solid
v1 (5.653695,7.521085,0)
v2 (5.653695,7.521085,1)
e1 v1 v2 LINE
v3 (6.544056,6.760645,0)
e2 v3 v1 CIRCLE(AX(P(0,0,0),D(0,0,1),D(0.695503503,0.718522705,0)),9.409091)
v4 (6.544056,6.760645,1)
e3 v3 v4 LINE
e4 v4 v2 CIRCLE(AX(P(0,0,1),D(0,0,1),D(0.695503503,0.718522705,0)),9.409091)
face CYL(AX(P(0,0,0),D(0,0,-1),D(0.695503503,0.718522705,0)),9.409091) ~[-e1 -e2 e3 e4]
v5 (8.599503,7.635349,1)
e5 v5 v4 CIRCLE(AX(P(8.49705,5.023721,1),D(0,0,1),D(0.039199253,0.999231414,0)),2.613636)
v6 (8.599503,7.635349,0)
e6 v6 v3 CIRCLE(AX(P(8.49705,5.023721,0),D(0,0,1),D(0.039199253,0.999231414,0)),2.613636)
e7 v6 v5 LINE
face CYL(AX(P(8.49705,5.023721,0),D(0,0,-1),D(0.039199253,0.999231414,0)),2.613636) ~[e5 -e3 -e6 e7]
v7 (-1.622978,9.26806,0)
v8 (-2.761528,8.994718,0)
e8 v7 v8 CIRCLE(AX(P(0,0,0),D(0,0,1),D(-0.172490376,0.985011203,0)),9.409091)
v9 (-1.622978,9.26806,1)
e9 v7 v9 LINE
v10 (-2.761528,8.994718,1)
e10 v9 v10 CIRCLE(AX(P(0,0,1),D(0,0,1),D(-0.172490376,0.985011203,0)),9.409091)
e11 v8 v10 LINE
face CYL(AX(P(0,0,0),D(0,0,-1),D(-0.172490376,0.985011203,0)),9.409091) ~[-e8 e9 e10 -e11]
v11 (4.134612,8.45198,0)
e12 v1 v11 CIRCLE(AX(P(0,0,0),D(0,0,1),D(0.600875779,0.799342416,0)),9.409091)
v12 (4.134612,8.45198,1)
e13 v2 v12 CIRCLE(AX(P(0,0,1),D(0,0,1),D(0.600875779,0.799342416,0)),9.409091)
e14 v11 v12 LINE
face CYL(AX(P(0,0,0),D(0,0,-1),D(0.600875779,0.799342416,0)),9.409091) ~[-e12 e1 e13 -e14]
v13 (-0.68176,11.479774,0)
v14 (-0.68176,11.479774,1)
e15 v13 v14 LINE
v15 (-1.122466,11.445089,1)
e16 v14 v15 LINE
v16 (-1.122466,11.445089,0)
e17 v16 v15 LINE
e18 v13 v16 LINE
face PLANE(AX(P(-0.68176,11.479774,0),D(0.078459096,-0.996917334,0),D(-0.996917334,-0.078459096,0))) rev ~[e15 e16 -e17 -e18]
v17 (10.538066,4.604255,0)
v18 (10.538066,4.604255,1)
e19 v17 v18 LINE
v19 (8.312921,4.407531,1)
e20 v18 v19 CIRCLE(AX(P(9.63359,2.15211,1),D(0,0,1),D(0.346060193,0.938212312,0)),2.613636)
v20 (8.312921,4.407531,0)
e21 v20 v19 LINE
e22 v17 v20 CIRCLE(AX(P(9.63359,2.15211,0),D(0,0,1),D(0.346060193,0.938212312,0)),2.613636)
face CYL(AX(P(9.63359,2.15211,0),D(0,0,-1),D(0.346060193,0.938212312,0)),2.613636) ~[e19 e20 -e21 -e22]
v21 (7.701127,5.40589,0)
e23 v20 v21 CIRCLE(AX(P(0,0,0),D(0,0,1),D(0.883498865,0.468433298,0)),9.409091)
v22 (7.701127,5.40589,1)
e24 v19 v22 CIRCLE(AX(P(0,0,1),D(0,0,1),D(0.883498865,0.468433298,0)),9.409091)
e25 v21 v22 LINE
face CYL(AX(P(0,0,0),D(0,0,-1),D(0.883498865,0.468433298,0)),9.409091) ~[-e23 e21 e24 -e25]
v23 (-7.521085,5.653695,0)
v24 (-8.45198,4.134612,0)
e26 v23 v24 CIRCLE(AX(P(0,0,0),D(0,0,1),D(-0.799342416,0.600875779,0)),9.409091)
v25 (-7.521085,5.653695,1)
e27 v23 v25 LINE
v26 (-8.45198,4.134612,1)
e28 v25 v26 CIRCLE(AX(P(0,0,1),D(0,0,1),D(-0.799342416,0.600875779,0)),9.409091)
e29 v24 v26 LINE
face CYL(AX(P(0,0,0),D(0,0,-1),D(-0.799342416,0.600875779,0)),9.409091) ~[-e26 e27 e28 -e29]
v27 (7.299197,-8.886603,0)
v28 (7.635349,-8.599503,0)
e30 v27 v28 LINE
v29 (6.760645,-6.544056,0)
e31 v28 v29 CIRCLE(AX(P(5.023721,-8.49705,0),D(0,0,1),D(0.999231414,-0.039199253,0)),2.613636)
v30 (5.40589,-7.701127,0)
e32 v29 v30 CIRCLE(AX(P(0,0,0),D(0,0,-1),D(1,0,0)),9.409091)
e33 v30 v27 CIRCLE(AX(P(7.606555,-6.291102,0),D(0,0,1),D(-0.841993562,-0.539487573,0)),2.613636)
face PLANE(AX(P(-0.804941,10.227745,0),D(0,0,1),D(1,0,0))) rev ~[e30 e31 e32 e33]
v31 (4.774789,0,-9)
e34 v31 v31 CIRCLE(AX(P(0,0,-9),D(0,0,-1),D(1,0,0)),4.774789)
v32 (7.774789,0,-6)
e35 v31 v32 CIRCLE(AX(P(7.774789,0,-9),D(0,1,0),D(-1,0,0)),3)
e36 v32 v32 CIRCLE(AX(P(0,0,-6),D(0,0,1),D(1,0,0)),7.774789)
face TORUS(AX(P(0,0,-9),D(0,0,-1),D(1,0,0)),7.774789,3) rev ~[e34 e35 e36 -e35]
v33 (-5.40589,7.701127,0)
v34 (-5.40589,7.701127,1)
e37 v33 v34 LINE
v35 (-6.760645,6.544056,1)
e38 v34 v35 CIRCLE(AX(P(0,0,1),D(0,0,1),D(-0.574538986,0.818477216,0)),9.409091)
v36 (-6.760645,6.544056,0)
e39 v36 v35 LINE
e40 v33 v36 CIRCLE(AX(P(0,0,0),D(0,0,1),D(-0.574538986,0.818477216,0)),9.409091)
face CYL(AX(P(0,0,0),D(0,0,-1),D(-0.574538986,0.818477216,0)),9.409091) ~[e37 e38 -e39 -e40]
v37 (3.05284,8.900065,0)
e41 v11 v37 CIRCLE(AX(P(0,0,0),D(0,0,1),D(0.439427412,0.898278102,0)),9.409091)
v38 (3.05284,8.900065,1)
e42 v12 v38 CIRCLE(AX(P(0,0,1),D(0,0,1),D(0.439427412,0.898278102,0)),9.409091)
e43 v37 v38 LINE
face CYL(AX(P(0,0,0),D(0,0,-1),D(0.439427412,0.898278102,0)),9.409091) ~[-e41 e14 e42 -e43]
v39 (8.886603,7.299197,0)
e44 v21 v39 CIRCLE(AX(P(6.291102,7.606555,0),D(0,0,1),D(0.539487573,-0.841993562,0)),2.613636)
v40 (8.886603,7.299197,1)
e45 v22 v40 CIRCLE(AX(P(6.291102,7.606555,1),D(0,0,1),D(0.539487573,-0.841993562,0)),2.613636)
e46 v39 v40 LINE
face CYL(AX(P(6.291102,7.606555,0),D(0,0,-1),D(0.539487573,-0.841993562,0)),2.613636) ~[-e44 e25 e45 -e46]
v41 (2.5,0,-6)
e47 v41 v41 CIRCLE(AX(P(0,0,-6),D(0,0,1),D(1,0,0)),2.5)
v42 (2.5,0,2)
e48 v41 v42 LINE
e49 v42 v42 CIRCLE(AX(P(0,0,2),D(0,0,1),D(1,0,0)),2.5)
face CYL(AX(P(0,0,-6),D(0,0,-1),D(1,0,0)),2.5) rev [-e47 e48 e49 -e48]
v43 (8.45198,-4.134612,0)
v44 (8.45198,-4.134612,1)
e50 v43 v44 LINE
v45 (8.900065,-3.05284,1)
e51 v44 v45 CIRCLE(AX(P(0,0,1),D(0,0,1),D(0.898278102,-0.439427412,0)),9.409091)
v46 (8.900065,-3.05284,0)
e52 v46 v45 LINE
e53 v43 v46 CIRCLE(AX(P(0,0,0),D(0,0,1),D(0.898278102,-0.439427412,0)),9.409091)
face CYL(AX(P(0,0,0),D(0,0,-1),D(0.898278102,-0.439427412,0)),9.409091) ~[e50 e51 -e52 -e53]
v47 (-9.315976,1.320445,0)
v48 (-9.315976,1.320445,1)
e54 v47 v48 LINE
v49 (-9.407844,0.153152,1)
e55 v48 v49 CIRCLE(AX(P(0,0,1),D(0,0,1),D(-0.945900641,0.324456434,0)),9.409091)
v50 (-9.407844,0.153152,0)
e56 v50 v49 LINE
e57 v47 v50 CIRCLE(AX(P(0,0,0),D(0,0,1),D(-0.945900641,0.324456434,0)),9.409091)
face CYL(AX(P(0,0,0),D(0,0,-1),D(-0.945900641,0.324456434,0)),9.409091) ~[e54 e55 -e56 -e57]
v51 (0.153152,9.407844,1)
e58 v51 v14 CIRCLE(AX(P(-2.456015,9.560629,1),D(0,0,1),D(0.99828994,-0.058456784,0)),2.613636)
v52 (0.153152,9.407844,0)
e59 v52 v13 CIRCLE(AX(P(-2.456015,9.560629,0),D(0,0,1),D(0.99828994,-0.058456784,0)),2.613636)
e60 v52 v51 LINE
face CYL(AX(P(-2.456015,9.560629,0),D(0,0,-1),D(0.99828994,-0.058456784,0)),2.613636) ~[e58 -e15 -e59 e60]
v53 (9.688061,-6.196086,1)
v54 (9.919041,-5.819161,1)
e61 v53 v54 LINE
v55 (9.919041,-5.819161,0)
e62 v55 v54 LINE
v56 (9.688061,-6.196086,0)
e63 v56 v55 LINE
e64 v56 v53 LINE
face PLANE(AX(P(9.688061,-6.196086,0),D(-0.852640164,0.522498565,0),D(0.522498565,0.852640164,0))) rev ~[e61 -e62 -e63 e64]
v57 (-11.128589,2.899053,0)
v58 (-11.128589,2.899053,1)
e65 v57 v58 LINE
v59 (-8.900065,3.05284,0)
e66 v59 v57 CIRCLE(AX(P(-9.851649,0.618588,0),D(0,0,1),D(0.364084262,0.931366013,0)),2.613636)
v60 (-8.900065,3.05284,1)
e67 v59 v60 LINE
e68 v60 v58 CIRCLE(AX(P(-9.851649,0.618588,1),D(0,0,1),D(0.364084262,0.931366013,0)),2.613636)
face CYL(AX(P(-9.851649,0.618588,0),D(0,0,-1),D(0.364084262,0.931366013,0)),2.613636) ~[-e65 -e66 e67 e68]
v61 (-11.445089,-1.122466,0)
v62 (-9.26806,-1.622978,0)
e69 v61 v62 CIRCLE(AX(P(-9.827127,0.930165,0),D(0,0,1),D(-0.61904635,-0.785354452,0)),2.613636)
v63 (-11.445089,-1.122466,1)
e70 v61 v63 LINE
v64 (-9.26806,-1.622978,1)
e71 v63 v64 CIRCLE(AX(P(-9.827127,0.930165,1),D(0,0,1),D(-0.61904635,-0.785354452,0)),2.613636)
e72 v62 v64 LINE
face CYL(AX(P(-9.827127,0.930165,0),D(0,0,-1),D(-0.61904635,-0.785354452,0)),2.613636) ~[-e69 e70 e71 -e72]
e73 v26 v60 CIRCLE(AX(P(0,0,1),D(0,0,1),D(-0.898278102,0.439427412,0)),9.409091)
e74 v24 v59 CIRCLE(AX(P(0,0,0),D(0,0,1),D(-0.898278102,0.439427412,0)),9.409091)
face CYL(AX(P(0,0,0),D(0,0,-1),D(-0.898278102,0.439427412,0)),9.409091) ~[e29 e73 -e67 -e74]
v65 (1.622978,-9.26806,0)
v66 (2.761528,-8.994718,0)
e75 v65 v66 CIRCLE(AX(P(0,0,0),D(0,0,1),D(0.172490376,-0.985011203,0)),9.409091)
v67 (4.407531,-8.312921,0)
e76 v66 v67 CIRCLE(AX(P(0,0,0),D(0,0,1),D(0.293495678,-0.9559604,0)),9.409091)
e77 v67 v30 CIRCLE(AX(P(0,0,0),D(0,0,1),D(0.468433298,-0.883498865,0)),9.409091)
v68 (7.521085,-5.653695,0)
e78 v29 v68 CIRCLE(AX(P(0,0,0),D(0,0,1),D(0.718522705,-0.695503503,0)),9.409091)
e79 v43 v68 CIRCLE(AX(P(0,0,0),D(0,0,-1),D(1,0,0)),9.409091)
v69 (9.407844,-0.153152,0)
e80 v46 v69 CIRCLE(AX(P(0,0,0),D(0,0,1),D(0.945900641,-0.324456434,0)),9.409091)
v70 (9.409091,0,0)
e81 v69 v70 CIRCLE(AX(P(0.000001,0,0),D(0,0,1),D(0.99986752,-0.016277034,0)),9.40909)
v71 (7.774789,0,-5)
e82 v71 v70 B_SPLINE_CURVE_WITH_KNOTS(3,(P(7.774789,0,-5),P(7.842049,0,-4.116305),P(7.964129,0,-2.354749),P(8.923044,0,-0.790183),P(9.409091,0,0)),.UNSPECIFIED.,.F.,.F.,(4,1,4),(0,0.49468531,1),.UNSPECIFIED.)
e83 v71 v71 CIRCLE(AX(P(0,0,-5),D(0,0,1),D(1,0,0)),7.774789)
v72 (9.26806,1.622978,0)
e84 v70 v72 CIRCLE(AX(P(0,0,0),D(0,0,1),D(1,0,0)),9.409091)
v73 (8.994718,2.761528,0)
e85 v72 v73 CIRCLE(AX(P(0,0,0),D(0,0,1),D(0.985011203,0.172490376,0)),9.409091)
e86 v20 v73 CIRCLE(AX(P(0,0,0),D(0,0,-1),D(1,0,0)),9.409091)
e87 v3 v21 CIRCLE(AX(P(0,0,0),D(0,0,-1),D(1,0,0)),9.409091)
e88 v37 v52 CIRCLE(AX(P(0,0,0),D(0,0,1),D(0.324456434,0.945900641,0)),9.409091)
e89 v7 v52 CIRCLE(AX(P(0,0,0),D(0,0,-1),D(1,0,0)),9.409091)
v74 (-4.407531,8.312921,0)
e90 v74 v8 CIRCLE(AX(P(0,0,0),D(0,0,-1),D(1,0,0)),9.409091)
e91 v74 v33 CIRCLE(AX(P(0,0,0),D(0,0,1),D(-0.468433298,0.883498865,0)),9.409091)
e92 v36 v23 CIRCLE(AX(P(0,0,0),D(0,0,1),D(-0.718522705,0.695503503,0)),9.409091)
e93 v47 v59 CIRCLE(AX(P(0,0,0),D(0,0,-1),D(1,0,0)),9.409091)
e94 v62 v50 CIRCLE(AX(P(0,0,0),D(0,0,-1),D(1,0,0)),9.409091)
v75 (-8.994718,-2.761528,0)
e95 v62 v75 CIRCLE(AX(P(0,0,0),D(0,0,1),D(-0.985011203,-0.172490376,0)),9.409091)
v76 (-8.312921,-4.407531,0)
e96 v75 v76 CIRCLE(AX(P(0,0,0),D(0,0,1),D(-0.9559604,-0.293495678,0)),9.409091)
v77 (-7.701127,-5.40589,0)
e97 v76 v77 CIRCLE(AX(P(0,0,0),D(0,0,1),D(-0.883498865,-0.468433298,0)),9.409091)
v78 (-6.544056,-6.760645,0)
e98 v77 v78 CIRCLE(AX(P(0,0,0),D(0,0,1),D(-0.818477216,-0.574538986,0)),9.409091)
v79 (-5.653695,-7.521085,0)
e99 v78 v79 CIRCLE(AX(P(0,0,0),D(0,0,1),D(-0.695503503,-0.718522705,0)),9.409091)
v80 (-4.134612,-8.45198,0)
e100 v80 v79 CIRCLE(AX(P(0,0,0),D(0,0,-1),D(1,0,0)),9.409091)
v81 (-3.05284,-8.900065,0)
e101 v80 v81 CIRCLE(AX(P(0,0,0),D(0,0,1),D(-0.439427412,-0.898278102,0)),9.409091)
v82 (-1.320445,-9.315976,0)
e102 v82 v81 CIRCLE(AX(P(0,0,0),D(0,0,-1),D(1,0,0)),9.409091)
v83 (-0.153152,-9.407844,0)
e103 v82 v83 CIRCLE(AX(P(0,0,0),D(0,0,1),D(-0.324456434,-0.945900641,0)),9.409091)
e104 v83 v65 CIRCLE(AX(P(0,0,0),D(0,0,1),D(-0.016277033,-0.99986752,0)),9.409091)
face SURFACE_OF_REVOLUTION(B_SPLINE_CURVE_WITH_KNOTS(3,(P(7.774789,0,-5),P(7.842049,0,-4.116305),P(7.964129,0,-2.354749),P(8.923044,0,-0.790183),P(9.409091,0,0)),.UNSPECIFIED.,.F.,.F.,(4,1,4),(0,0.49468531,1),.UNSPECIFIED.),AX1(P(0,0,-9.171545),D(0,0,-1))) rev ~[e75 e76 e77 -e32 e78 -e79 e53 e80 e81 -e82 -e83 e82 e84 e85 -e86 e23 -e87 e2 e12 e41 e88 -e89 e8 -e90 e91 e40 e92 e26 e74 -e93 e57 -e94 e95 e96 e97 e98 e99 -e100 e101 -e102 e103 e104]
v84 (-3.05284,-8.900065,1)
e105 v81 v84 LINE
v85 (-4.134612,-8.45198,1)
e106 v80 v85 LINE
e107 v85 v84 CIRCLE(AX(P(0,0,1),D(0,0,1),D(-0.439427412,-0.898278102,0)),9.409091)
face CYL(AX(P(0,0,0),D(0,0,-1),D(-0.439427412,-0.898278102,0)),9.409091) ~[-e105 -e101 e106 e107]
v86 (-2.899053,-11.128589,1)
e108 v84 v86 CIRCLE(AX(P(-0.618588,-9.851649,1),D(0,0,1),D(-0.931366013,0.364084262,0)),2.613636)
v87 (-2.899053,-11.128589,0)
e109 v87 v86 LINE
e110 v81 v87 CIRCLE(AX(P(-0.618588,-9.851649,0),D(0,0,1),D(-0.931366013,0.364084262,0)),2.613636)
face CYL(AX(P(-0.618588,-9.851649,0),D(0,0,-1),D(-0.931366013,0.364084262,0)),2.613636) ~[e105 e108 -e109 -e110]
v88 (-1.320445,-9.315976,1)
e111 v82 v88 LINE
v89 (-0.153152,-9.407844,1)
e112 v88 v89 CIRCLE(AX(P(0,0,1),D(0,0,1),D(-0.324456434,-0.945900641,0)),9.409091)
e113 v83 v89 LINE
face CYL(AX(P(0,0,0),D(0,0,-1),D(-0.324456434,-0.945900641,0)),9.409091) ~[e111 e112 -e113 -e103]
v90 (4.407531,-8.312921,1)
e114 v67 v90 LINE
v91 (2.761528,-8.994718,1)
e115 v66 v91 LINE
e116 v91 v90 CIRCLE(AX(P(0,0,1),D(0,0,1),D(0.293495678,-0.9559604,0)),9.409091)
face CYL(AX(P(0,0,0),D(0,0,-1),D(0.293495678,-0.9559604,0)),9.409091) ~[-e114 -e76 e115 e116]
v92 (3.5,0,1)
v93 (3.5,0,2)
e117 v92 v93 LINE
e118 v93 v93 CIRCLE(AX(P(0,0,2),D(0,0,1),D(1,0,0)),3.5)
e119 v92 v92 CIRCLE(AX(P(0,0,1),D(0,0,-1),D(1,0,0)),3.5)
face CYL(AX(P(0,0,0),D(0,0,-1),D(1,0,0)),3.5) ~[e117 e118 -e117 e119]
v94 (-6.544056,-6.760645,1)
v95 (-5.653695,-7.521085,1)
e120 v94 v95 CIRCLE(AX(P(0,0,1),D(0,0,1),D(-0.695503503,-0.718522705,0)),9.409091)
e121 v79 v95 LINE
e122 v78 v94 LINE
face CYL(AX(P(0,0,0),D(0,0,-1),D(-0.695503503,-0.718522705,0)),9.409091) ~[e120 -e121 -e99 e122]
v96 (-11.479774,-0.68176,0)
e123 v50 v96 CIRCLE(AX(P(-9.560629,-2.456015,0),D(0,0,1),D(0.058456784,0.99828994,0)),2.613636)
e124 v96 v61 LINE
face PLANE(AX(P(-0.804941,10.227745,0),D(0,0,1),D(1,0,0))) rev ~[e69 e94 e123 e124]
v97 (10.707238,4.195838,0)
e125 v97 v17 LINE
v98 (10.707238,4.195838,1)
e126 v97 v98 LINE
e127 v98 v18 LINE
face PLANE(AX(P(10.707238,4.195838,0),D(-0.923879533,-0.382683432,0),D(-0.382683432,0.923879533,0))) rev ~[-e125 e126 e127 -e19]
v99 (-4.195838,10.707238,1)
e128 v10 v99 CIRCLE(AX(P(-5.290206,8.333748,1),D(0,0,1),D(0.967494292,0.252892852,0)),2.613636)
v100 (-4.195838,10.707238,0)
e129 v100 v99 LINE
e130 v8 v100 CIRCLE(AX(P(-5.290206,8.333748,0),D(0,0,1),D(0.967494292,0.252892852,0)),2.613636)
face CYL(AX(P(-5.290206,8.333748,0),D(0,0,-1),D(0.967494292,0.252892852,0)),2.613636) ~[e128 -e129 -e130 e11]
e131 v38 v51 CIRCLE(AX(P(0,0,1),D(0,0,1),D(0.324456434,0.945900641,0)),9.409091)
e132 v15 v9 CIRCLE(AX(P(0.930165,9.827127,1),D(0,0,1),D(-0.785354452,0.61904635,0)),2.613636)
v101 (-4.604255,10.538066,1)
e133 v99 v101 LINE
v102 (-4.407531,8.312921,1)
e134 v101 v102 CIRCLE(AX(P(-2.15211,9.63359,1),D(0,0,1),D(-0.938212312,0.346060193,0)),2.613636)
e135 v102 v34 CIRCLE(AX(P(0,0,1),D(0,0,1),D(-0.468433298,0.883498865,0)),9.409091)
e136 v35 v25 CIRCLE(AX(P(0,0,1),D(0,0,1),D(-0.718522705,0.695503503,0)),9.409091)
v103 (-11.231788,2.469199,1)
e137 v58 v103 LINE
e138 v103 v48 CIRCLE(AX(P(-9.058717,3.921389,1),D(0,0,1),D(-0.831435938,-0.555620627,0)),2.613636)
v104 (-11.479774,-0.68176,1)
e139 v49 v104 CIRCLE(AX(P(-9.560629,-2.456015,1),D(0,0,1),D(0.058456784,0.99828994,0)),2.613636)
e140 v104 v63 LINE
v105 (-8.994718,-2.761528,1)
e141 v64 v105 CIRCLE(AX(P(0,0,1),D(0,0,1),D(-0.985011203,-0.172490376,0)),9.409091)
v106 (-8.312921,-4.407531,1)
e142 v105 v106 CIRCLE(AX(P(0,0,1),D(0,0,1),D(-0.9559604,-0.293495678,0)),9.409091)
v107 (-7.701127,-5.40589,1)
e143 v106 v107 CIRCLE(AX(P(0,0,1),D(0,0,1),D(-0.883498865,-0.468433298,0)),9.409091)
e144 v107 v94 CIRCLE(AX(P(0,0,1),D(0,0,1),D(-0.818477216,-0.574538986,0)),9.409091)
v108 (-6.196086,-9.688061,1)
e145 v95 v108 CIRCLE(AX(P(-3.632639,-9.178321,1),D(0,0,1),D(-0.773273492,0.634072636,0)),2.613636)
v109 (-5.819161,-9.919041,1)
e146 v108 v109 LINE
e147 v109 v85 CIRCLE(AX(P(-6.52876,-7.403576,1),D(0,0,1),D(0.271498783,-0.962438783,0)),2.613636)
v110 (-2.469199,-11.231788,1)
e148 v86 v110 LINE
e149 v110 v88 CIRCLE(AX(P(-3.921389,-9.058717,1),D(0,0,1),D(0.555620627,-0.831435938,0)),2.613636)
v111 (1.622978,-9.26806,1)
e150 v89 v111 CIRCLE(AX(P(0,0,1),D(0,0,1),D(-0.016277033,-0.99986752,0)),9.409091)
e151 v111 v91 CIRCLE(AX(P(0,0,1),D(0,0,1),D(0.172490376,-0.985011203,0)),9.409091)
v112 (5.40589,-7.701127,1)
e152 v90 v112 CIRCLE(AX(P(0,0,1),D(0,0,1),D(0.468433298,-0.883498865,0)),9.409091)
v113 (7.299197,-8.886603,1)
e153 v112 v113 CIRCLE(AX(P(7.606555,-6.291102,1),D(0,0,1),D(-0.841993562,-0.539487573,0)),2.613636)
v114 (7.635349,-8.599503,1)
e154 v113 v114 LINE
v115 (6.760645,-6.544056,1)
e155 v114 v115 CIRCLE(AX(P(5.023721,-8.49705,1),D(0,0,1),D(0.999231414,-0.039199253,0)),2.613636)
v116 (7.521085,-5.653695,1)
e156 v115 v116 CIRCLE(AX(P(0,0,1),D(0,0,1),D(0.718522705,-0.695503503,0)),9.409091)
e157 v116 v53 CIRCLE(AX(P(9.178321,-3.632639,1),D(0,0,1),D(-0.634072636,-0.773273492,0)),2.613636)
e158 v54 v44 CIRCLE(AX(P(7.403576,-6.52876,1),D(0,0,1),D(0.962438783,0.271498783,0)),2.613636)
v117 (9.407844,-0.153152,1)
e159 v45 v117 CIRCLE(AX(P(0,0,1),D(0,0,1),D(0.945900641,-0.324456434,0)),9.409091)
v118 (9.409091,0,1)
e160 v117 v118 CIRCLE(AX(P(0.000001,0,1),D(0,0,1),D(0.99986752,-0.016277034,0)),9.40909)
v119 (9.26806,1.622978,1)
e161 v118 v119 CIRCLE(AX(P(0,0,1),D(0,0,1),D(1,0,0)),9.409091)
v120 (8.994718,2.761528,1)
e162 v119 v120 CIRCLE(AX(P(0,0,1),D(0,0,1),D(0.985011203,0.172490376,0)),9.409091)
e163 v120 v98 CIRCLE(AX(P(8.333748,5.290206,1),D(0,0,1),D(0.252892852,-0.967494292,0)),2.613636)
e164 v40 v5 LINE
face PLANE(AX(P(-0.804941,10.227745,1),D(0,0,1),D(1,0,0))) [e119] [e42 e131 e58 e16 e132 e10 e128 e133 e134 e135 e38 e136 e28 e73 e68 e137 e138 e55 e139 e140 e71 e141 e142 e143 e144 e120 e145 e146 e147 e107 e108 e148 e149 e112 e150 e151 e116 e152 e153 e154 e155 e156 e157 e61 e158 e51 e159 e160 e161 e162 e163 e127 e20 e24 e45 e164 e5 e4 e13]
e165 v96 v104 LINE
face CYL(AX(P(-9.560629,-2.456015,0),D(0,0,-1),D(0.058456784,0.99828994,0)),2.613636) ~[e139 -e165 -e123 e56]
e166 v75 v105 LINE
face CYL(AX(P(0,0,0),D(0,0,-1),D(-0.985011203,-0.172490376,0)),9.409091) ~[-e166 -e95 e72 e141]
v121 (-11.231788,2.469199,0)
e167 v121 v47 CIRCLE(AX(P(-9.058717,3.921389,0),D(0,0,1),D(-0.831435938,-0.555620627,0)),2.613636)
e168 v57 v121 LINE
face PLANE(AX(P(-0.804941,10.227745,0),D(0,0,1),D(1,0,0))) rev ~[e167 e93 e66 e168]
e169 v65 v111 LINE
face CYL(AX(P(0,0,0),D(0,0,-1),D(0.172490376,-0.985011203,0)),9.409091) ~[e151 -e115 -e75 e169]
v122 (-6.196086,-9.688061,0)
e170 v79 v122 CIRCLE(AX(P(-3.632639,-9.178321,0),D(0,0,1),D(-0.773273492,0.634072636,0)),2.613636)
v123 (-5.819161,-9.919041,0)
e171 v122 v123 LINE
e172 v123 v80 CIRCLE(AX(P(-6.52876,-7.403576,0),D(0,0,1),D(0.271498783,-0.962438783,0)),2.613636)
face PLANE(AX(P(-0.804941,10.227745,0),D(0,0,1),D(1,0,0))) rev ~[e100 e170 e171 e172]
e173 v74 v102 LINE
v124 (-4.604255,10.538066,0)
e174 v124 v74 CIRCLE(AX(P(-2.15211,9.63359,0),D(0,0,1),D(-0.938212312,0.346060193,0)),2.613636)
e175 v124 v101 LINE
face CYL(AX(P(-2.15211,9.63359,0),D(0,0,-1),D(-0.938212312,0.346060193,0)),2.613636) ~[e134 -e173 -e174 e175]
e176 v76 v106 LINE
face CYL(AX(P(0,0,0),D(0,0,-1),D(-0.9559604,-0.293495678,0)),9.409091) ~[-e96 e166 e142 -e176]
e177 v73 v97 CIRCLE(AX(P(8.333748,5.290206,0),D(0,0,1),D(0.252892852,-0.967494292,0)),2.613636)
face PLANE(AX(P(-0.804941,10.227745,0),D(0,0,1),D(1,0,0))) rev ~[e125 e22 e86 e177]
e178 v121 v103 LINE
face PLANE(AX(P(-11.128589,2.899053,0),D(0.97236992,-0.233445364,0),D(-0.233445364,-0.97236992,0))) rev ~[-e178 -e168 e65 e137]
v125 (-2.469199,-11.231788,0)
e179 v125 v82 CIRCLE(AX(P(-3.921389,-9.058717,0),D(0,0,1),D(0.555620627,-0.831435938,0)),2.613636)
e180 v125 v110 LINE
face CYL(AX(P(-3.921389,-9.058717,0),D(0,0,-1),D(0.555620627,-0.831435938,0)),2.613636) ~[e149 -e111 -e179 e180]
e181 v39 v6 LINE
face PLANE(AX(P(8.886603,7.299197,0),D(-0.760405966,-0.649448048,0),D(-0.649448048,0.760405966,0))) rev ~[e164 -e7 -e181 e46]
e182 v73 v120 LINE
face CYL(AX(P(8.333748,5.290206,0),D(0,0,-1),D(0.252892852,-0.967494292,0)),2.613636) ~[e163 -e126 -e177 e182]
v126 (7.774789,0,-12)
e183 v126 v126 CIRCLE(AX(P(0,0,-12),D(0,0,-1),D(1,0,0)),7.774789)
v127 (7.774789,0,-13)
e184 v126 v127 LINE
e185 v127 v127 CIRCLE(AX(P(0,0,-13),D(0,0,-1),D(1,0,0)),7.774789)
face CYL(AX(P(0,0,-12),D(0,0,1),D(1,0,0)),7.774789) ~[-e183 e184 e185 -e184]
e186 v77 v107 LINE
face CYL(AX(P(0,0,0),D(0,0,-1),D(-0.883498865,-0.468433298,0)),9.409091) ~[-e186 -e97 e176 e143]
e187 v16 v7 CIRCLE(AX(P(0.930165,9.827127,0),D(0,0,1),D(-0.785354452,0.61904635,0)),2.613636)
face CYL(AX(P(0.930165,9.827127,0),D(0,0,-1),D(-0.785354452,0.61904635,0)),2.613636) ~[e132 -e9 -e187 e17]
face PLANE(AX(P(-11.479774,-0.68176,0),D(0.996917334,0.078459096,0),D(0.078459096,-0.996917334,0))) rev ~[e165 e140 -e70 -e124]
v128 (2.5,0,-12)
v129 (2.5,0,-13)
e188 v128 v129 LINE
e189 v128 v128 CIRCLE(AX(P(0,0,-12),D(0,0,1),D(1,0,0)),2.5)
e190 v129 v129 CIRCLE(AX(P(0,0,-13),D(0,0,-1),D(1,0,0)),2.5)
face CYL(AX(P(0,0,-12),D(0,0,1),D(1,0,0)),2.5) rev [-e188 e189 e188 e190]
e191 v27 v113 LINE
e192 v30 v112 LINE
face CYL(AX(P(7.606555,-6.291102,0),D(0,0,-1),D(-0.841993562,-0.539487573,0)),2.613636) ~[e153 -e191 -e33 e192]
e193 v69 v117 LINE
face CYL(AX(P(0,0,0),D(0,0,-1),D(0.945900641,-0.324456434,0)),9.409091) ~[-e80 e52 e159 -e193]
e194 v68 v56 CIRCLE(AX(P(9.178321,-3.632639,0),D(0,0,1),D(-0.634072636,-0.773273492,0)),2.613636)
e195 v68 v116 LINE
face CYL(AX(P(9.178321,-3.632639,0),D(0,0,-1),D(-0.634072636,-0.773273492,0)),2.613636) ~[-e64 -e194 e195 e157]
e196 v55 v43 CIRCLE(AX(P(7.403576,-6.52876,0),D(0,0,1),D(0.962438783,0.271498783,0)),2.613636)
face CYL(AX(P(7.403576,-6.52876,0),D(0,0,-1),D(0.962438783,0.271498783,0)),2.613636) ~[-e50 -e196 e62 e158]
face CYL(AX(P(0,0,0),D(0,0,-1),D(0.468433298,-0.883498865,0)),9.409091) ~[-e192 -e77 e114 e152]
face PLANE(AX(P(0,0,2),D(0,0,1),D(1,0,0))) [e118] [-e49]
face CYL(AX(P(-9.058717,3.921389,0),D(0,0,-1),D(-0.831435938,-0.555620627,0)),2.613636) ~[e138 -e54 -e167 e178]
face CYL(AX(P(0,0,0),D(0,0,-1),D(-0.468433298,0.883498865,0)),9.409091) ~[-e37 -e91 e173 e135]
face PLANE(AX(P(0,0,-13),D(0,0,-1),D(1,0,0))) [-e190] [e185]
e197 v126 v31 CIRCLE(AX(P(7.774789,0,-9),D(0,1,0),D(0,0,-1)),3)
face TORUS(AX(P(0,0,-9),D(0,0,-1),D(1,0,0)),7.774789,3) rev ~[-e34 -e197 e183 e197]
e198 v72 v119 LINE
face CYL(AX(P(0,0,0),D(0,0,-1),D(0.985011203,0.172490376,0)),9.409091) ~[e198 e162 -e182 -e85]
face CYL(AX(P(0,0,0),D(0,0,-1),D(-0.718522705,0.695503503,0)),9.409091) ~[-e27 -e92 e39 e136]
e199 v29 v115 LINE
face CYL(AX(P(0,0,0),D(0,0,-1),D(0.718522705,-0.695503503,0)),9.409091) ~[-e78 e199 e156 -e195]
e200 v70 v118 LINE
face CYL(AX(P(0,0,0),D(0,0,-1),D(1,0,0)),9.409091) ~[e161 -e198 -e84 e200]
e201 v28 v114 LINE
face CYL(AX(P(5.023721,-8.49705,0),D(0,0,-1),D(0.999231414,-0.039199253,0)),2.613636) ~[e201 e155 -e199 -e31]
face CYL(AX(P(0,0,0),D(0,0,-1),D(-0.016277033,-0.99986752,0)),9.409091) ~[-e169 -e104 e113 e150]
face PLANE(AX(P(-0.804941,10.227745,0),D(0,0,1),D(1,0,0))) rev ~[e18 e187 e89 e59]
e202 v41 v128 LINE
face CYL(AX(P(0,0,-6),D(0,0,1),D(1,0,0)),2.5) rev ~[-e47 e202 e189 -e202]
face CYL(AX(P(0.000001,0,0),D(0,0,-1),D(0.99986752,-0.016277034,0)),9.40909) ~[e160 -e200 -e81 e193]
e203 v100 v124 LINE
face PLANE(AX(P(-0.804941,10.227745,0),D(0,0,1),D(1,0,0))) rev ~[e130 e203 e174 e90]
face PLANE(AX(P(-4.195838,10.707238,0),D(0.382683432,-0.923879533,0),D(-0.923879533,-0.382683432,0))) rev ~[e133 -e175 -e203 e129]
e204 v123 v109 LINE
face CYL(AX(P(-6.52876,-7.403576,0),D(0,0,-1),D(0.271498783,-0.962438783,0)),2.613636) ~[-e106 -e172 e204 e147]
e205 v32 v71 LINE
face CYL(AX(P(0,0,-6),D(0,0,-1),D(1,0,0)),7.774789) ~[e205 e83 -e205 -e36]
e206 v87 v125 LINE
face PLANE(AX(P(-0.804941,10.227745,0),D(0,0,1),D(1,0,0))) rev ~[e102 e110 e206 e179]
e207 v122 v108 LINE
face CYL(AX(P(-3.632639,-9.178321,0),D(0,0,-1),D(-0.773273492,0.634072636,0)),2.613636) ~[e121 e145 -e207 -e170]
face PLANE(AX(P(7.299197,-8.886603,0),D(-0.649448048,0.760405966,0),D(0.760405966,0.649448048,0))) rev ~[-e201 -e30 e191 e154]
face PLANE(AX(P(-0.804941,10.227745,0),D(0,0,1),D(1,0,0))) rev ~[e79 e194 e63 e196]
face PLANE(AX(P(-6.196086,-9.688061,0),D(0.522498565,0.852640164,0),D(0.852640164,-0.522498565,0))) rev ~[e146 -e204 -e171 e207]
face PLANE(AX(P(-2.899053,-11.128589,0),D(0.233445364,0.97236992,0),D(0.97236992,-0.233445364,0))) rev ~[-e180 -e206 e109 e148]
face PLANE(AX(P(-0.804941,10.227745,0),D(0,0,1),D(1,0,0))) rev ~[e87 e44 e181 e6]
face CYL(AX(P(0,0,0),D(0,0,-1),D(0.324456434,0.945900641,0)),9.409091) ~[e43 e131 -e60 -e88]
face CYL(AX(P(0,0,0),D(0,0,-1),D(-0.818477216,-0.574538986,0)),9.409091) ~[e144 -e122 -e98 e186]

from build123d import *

# Parameters (mm, degrees)
F1_R      = 3.5
F1_R_2    = 2.5
F2_DEPTH  = 1
F3_DEPTH  = 2
F5_R      = 4.7747891135
F5_R_2    = 2.5
F6_DEPTH  = 6
F5_R_3    = 7.7747891135
F7_DEPTH  = 1
F8_DEPTH  = 6
F9_R      = 7.7747891135
F9_R_2    = 4.7747891135
F9_R_3    = 2.5
F10_DEPTH = 1


# Not quite as in the source:
# - a feature names something its author has since deleted; it is built from what else it names


with BuildPart() as f2:
    # F1 (on Top) → F2 (new body)
    with BuildSketch(Plane.XY):
        with BuildLine():
            ThreePointArc((-1.6229776334, 9.2680599554), (-0.7382287643, 9.3800858219), (0.1531520845, 9.4078443957))
            ThreePointArc((0.1531520845, 9.4078443957), (-0.0317997207, 10.5374998224), (-0.6817601701, 11.4797736507))
            Line((-0.6817601701, 11.4797736507), (-1.1224656787, 11.4450893749))
            ThreePointArc((-1.1224656787, 11.4450893749), (-1.6170199342, 10.4127402859), (-1.6229776334, 9.2680599554))
        make_face()
        with BuildLine():
            ThreePointArc((9.4078443957, -0.1531520845), (9.4087792756, -0.0765785786), (9.4090909091, 0))
            ThreePointArc((9.4090909091, 0), (9.3737668631, 0.8145468262), (9.2680599554, 1.6229776334))
            ThreePointArc((9.2680599554, 1.6229776334), (9.1491169783, 2.1965086508), (8.9947183137, 2.7615275108))
            ThreePointArc((8.9947183137, 2.7615275108), (8.6928665104, 3.6007032045), (8.3129211438, 4.4075314852))
            ThreePointArc((8.3129211438, 4.4075314852), (8.0225688191, 4.9162364953), (7.7011265332, 5.4058895526))
            ThreePointArc((7.7011265332, 5.4058895526), (7.1547288581, 6.1107157275), (6.5440556911, 6.7606454461))
            ThreePointArc((6.5440556911, 6.7606454461), (6.1107157275, 7.1547288581), (5.6536948308, 7.52108546))
            ThreePointArc((5.6536948308, 7.52108546), (4.9162364953, 8.0225688191), (4.1346124722, 8.4519803265))
            ThreePointArc((4.1346124722, 8.4519803265), (3.6007032045, 8.6928665104), (3.0528400867, 8.90006512))
            ThreePointArc((3.0528400867, 8.90006512), (2.1965086508, 9.1491169783), (1.320444577, 9.3159764842))
            ThreePointArc((1.320444577, 9.3159764842), (0.7382287643, 9.3800858219), (0.1531520845, 9.4078443957))
            ThreePointArc((0.1531520845, 9.4078443957), (-0.7382287643, 9.3800858219), (-1.6229776334, 9.2680599554))
            ThreePointArc((-1.6229776334, 9.2680599554), (-2.1965086508, 9.1491169783), (-2.7615275108, 8.9947183137))
            ThreePointArc((-2.7615275108, 8.9947183137), (-3.6007032045, 8.6928665104), (-4.4075314852, 8.3129211438))
            ThreePointArc((-4.4075314852, 8.3129211438), (-4.9162364953, 8.0225688191), (-5.4058895526, 7.7011265332))
            ThreePointArc((-5.4058895526, 7.7011265332), (-6.1107157275, 7.1547288581), (-6.7606454461, 6.5440556911))
            ThreePointArc((-6.7606454461, 6.5440556911), (-7.1547288581, 6.1107157275), (-7.52108546, 5.6536948308))
            ThreePointArc((-7.52108546, 5.6536948308), (-8.0225688191, 4.9162364953), (-8.4519803265, 4.1346124722))
            ThreePointArc((-8.4519803265, 4.1346124722), (-8.6928665104, 3.6007032045), (-8.90006512, 3.0528400867))
            ThreePointArc((-8.90006512, 3.0528400867), (-9.1491169783, 2.1965086508), (-9.3159764842, 1.320444577))
            ThreePointArc((-9.3159764842, 1.320444577), (-9.3800858219, 0.7382287643), (-9.4078443957, 0.1531520845))
            ThreePointArc((-9.4078443957, 0.1531520845), (-9.3800858219, -0.7382287643), (-9.2680599554, -1.6229776334))
            ThreePointArc((-9.2680599554, -1.6229776334), (-9.1491169783, -2.1965086508), (-8.9947183137, -2.7615275108))
            ThreePointArc((-8.9947183137, -2.7615275108), (-8.6928665104, -3.6007032045), (-8.3129211438, -4.4075314852))
            ThreePointArc((-8.3129211438, -4.4075314852), (-8.0225688191, -4.9162364953), (-7.7011265332, -5.4058895526))
            ThreePointArc((-7.7011265332, -5.4058895526), (-7.1547288581, -6.1107157275), (-6.5440556911, -6.7606454461))
            ThreePointArc((-6.5440556911, -6.7606454461), (-6.1107157275, -7.1547288581), (-5.6536948308, -7.52108546))
            ThreePointArc((-5.6536948308, -7.52108546), (-4.9162364953, -8.0225688191), (-4.1346124722, -8.4519803265))
            ThreePointArc((-4.1346124722, -8.4519803265), (-3.6007032045, -8.6928665104), (-3.0528400867, -8.90006512))
            ThreePointArc((-3.0528400867, -8.90006512), (-2.1965086508, -9.1491169783), (-1.320444577, -9.3159764842))
            ThreePointArc((-1.320444577, -9.3159764842), (-0.7382287643, -9.3800858219), (-0.1531520845, -9.4078443957))
            ThreePointArc((-0.1531520845, -9.4078443957), (0.7382287643, -9.3800858219), (1.6229776334, -9.2680599554))
            ThreePointArc((1.6229776334, -9.2680599554), (2.1965086508, -9.1491169783), (2.7615275108, -8.9947183137))
            ThreePointArc((2.7615275108, -8.9947183137), (3.6007032045, -8.6928665104), (4.4075314852, -8.3129211438))
            ThreePointArc((4.4075314852, -8.3129211438), (4.9162364953, -8.0225688191), (5.4058895526, -7.7011265332))
            ThreePointArc((5.4058895526, -7.7011265332), (6.1107157275, -7.1547288581), (6.7606454461, -6.5440556911))
            ThreePointArc((6.7606454461, -6.5440556911), (7.1547288581, -6.1107157275), (7.52108546, -5.6536948308))
            ThreePointArc((7.52108546, -5.6536948308), (8.0225688191, -4.9162364953), (8.4519803265, -4.1346124722))
            ThreePointArc((8.4519803265, -4.1346124722), (8.6928665104, -3.6007032045), (8.90006512, -3.0528400867))
            ThreePointArc((8.90006512, -3.0528400867), (9.1491169783, -2.1965086508), (9.3159764842, -1.320444577))
            ThreePointArc((9.3159764842, -1.320444577), (9.3800858219, -0.7382287643), (9.4078443957, -0.1531520845))
        make_face()
        Circle(F1_R, mode=Mode.SUBTRACT)
        with BuildLine():
            ThreePointArc((-4.4075314852, 8.3129211438), (-3.6007032045, 8.6928665104), (-2.7615275108, 8.9947183137))
            ThreePointArc((-2.7615275108, 8.9947183137), (-3.286509855, 10.0119312174), (-4.195837602, 10.7072380574))
            Line((-4.195837602, 10.7072380574), (-4.604255417, 10.5380658593))
            ThreePointArc((-4.604255417, 10.5380658593), (-4.7555910517, 9.4034178615), (-4.4075314852, 8.3129211438))
        make_face()
        with BuildLine():
            ThreePointArc((-9.3159764842, 1.320444577), (-9.1491169783, 2.1965086508), (-8.90006512, 3.0528400867))
            ThreePointArc((-8.90006512, 3.0528400867), (-10.0315845257, 3.2260231917), (-11.1285890147, 2.8990526973))
            Line((-11.1285890147, 2.8990526973), (-11.2317877999, 2.469198821))
            ThreePointArc((-11.2317877999, 2.469198821), (-10.4027911413, 1.679836361), (-9.3159764842, 1.320444577))
        make_face()
        with BuildLine():
            ThreePointArc((-9.2680599554, -1.6229776334), (-9.3800858219, -0.7382287643), (-9.4078443957, 0.1531520845))
            ThreePointArc((-9.4078443957, 0.1531520845), (-10.5374998224, -0.0317997207), (-11.4797736507, -0.6817601701))
            Line((-11.4797736507, -0.6817601701), (-11.4450893749, -1.1224656787))
            ThreePointArc((-11.4450893749, -1.1224656787), (-10.4127402859, -1.6170199342), (-9.2680599554, -1.6229776334))
        make_face()
        with BuildLine():
            ThreePointArc((-5.8191609361, -9.9190405786), (-4.812258569, -9.3745443193), (-4.1346124722, -8.4519803265))
            ThreePointArc((-4.1346124722, -8.4519803265), (-4.9162364953, -8.0225688191), (-5.6536948308, -7.52108546))
            ThreePointArc((-5.6536948308, -7.52108546), (-6.1680604771, -8.5437078414), (-6.1960860878, -9.6880605486))
            Line((-6.1960860878, -9.6880605486), (-5.8191609361, -9.9190405786))
        make_face()
        with BuildLine():
            ThreePointArc((-2.469198821, -11.2317877999), (-1.679836361, -10.4027911413), (-1.320444577, -9.3159764842))
            ThreePointArc((-1.320444577, -9.3159764842), (-2.1965086508, -9.1491169783), (-3.0528400867, -8.90006512))
            ThreePointArc((-3.0528400867, -8.90006512), (-3.2260231917, -10.0315845257), (-2.8990526973, -11.1285890147))
            Line((-2.8990526973, -11.1285890147), (-2.469198821, -11.2317877999))
        make_face()
        with BuildLine():
            ThreePointArc((7.6353485554, -8.5995030343), (7.428651783, -7.4736233793), (6.7606454461, -6.5440556911))
            ThreePointArc((6.7606454461, -6.5440556911), (6.1107157275, -7.1547288581), (5.4058895526, -7.7011265332))
            ThreePointArc((5.4058895526, -7.7011265332), (6.2195135061, -8.5063250277), (7.2991972152, -8.8866034014))
            Line((7.2991972152, -8.8866034014), (7.6353485554, -8.5995030343))
        make_face()
        with BuildLine():
            ThreePointArc((9.9190405786, -5.8191609361), (9.3745443193, -4.812258569), (8.4519803265, -4.1346124722))
            ThreePointArc((8.4519803265, -4.1346124722), (8.0225688191, -4.9162364953), (7.52108546, -5.6536948308))
            ThreePointArc((7.52108546, -5.6536948308), (8.5437078414, -6.1680604771), (9.6880605486, -6.1960860878))
            Line((9.6880605486, -6.1960860878), (9.9190405786, -5.8191609361))
        make_face()
        with BuildLine():
            ThreePointArc((8.3129211438, 4.4075314852), (8.6928665104, 3.6007032045), (8.9947183137, 2.7615275108))
            ThreePointArc((8.9947183137, 2.7615275108), (10.0119312174, 3.286509855), (10.7072380574, 4.195837602))
            Line((10.7072380574, 4.195837602), (10.5380658593, 4.604255417))
            ThreePointArc((10.5380658593, 4.604255417), (9.4034178615, 4.7555910517), (8.3129211438, 4.4075314852))
        make_face()
        with BuildLine():
            ThreePointArc((6.5440556911, 6.7606454461), (7.1547288581, 6.1107157275), (7.7011265332, 5.4058895526))
            ThreePointArc((7.7011265332, 5.4058895526), (8.5063250277, 6.2195135061), (8.8866034014, 7.2991972152))
            Line((8.8866034014, 7.2991972152), (8.5995030343, 7.6353485554))
            ThreePointArc((8.5995030343, 7.6353485554), (7.4736233793, 7.428651783), (6.5440556911, 6.7606454461))
        make_face()
        Circle(F1_R)
        Circle(F1_R_2, mode=Mode.SUBTRACT)
    extrude(amount=F2_DEPTH)

    # F1 (on Top) → F3 (join)
    with BuildSketch(Plane.XY):
        Circle(F1_R)
        Circle(F1_R_2, mode=Mode.SUBTRACT)
    extrude(amount=F3_DEPTH)

    # F5 (on offset) → F6 (join, through all)
    with BuildSketch(Plane.XY.offset(-6)):
        Circle(F5_R)
        Circle(F5_R_2, mode=Mode.SUBTRACT)
    extrude(amount=F6_DEPTH)

    # F5 (on offset) → F7 (join)
    with BuildSketch(Plane.XY.offset(-6)):
        Circle(F5_R_3)
        Circle(F5_R, mode=Mode.SUBTRACT)
    extrude(amount=F7_DEPTH)

    # F5 (on offset) → F8 (join)
    with BuildSketch(Plane.XY.offset(-6)):
        Circle(F5_R)
        Circle(F5_R_2, mode=Mode.SUBTRACT)
    extrude(amount=-F8_DEPTH)

    # F9 (on face) → F10 (join)
    with BuildSketch(Plane(origin=(0, 0, -12), x_dir=(1, 0, 0), z_dir=(0, 0, -1))):
        Circle(F9_R)
        Circle(F9_R_2, mode=Mode.SUBTRACT)
        Circle(F9_R_2)
        Circle(F9_R_3, mode=Mode.SUBTRACT)
    extrude(amount=F10_DEPTH)

    # F11 (on Front) → F12 (revolve)
    with BuildSketch(Plane.XZ):
        with BuildLine():
            Line((7.7747891135, -6), (4.7747891135, -6))
            Line((4.7747891135, -6), (4.7747891135, -9))
            ThreePointArc((4.7747891135, -9), (5.6534687699, -6.8786796564), (7.7747891135, -6))
        make_face()
        with BuildLine():
            ThreePointArc((7.7747891135, -12), (5.6534687699, -11.1213203436), (4.7747891135, -9))
            Line((4.7747891135, -9), (4.7747891135, -12))
            Line((4.7747891135, -12), (7.7747891135, -12))
        make_face()
        with BuildLine():
            add(Edge.make_bspline(
                [(7.7747891135, -5), (7.8420486188, -4.1163054386), (7.9641288698, -2.3547490655), (8.9230440814, -0.790182696), (9.4090909091, 0)],
                knots=[0, 0, 0, 0, 0.4946853103, 1, 1, 1, 1], degree=3))
            Line((9.4090909091, 0), (4.7747891135, 0))
            Line((4.7747891135, 0), (4.7747891135, -5))
            Line((4.7747891135, -5), (7.7747891135, -5))
        make_face()
    revolve(axis=Axis((0, 0, -9.1715450399), (0, 0, -1)))


solid = f2.part
